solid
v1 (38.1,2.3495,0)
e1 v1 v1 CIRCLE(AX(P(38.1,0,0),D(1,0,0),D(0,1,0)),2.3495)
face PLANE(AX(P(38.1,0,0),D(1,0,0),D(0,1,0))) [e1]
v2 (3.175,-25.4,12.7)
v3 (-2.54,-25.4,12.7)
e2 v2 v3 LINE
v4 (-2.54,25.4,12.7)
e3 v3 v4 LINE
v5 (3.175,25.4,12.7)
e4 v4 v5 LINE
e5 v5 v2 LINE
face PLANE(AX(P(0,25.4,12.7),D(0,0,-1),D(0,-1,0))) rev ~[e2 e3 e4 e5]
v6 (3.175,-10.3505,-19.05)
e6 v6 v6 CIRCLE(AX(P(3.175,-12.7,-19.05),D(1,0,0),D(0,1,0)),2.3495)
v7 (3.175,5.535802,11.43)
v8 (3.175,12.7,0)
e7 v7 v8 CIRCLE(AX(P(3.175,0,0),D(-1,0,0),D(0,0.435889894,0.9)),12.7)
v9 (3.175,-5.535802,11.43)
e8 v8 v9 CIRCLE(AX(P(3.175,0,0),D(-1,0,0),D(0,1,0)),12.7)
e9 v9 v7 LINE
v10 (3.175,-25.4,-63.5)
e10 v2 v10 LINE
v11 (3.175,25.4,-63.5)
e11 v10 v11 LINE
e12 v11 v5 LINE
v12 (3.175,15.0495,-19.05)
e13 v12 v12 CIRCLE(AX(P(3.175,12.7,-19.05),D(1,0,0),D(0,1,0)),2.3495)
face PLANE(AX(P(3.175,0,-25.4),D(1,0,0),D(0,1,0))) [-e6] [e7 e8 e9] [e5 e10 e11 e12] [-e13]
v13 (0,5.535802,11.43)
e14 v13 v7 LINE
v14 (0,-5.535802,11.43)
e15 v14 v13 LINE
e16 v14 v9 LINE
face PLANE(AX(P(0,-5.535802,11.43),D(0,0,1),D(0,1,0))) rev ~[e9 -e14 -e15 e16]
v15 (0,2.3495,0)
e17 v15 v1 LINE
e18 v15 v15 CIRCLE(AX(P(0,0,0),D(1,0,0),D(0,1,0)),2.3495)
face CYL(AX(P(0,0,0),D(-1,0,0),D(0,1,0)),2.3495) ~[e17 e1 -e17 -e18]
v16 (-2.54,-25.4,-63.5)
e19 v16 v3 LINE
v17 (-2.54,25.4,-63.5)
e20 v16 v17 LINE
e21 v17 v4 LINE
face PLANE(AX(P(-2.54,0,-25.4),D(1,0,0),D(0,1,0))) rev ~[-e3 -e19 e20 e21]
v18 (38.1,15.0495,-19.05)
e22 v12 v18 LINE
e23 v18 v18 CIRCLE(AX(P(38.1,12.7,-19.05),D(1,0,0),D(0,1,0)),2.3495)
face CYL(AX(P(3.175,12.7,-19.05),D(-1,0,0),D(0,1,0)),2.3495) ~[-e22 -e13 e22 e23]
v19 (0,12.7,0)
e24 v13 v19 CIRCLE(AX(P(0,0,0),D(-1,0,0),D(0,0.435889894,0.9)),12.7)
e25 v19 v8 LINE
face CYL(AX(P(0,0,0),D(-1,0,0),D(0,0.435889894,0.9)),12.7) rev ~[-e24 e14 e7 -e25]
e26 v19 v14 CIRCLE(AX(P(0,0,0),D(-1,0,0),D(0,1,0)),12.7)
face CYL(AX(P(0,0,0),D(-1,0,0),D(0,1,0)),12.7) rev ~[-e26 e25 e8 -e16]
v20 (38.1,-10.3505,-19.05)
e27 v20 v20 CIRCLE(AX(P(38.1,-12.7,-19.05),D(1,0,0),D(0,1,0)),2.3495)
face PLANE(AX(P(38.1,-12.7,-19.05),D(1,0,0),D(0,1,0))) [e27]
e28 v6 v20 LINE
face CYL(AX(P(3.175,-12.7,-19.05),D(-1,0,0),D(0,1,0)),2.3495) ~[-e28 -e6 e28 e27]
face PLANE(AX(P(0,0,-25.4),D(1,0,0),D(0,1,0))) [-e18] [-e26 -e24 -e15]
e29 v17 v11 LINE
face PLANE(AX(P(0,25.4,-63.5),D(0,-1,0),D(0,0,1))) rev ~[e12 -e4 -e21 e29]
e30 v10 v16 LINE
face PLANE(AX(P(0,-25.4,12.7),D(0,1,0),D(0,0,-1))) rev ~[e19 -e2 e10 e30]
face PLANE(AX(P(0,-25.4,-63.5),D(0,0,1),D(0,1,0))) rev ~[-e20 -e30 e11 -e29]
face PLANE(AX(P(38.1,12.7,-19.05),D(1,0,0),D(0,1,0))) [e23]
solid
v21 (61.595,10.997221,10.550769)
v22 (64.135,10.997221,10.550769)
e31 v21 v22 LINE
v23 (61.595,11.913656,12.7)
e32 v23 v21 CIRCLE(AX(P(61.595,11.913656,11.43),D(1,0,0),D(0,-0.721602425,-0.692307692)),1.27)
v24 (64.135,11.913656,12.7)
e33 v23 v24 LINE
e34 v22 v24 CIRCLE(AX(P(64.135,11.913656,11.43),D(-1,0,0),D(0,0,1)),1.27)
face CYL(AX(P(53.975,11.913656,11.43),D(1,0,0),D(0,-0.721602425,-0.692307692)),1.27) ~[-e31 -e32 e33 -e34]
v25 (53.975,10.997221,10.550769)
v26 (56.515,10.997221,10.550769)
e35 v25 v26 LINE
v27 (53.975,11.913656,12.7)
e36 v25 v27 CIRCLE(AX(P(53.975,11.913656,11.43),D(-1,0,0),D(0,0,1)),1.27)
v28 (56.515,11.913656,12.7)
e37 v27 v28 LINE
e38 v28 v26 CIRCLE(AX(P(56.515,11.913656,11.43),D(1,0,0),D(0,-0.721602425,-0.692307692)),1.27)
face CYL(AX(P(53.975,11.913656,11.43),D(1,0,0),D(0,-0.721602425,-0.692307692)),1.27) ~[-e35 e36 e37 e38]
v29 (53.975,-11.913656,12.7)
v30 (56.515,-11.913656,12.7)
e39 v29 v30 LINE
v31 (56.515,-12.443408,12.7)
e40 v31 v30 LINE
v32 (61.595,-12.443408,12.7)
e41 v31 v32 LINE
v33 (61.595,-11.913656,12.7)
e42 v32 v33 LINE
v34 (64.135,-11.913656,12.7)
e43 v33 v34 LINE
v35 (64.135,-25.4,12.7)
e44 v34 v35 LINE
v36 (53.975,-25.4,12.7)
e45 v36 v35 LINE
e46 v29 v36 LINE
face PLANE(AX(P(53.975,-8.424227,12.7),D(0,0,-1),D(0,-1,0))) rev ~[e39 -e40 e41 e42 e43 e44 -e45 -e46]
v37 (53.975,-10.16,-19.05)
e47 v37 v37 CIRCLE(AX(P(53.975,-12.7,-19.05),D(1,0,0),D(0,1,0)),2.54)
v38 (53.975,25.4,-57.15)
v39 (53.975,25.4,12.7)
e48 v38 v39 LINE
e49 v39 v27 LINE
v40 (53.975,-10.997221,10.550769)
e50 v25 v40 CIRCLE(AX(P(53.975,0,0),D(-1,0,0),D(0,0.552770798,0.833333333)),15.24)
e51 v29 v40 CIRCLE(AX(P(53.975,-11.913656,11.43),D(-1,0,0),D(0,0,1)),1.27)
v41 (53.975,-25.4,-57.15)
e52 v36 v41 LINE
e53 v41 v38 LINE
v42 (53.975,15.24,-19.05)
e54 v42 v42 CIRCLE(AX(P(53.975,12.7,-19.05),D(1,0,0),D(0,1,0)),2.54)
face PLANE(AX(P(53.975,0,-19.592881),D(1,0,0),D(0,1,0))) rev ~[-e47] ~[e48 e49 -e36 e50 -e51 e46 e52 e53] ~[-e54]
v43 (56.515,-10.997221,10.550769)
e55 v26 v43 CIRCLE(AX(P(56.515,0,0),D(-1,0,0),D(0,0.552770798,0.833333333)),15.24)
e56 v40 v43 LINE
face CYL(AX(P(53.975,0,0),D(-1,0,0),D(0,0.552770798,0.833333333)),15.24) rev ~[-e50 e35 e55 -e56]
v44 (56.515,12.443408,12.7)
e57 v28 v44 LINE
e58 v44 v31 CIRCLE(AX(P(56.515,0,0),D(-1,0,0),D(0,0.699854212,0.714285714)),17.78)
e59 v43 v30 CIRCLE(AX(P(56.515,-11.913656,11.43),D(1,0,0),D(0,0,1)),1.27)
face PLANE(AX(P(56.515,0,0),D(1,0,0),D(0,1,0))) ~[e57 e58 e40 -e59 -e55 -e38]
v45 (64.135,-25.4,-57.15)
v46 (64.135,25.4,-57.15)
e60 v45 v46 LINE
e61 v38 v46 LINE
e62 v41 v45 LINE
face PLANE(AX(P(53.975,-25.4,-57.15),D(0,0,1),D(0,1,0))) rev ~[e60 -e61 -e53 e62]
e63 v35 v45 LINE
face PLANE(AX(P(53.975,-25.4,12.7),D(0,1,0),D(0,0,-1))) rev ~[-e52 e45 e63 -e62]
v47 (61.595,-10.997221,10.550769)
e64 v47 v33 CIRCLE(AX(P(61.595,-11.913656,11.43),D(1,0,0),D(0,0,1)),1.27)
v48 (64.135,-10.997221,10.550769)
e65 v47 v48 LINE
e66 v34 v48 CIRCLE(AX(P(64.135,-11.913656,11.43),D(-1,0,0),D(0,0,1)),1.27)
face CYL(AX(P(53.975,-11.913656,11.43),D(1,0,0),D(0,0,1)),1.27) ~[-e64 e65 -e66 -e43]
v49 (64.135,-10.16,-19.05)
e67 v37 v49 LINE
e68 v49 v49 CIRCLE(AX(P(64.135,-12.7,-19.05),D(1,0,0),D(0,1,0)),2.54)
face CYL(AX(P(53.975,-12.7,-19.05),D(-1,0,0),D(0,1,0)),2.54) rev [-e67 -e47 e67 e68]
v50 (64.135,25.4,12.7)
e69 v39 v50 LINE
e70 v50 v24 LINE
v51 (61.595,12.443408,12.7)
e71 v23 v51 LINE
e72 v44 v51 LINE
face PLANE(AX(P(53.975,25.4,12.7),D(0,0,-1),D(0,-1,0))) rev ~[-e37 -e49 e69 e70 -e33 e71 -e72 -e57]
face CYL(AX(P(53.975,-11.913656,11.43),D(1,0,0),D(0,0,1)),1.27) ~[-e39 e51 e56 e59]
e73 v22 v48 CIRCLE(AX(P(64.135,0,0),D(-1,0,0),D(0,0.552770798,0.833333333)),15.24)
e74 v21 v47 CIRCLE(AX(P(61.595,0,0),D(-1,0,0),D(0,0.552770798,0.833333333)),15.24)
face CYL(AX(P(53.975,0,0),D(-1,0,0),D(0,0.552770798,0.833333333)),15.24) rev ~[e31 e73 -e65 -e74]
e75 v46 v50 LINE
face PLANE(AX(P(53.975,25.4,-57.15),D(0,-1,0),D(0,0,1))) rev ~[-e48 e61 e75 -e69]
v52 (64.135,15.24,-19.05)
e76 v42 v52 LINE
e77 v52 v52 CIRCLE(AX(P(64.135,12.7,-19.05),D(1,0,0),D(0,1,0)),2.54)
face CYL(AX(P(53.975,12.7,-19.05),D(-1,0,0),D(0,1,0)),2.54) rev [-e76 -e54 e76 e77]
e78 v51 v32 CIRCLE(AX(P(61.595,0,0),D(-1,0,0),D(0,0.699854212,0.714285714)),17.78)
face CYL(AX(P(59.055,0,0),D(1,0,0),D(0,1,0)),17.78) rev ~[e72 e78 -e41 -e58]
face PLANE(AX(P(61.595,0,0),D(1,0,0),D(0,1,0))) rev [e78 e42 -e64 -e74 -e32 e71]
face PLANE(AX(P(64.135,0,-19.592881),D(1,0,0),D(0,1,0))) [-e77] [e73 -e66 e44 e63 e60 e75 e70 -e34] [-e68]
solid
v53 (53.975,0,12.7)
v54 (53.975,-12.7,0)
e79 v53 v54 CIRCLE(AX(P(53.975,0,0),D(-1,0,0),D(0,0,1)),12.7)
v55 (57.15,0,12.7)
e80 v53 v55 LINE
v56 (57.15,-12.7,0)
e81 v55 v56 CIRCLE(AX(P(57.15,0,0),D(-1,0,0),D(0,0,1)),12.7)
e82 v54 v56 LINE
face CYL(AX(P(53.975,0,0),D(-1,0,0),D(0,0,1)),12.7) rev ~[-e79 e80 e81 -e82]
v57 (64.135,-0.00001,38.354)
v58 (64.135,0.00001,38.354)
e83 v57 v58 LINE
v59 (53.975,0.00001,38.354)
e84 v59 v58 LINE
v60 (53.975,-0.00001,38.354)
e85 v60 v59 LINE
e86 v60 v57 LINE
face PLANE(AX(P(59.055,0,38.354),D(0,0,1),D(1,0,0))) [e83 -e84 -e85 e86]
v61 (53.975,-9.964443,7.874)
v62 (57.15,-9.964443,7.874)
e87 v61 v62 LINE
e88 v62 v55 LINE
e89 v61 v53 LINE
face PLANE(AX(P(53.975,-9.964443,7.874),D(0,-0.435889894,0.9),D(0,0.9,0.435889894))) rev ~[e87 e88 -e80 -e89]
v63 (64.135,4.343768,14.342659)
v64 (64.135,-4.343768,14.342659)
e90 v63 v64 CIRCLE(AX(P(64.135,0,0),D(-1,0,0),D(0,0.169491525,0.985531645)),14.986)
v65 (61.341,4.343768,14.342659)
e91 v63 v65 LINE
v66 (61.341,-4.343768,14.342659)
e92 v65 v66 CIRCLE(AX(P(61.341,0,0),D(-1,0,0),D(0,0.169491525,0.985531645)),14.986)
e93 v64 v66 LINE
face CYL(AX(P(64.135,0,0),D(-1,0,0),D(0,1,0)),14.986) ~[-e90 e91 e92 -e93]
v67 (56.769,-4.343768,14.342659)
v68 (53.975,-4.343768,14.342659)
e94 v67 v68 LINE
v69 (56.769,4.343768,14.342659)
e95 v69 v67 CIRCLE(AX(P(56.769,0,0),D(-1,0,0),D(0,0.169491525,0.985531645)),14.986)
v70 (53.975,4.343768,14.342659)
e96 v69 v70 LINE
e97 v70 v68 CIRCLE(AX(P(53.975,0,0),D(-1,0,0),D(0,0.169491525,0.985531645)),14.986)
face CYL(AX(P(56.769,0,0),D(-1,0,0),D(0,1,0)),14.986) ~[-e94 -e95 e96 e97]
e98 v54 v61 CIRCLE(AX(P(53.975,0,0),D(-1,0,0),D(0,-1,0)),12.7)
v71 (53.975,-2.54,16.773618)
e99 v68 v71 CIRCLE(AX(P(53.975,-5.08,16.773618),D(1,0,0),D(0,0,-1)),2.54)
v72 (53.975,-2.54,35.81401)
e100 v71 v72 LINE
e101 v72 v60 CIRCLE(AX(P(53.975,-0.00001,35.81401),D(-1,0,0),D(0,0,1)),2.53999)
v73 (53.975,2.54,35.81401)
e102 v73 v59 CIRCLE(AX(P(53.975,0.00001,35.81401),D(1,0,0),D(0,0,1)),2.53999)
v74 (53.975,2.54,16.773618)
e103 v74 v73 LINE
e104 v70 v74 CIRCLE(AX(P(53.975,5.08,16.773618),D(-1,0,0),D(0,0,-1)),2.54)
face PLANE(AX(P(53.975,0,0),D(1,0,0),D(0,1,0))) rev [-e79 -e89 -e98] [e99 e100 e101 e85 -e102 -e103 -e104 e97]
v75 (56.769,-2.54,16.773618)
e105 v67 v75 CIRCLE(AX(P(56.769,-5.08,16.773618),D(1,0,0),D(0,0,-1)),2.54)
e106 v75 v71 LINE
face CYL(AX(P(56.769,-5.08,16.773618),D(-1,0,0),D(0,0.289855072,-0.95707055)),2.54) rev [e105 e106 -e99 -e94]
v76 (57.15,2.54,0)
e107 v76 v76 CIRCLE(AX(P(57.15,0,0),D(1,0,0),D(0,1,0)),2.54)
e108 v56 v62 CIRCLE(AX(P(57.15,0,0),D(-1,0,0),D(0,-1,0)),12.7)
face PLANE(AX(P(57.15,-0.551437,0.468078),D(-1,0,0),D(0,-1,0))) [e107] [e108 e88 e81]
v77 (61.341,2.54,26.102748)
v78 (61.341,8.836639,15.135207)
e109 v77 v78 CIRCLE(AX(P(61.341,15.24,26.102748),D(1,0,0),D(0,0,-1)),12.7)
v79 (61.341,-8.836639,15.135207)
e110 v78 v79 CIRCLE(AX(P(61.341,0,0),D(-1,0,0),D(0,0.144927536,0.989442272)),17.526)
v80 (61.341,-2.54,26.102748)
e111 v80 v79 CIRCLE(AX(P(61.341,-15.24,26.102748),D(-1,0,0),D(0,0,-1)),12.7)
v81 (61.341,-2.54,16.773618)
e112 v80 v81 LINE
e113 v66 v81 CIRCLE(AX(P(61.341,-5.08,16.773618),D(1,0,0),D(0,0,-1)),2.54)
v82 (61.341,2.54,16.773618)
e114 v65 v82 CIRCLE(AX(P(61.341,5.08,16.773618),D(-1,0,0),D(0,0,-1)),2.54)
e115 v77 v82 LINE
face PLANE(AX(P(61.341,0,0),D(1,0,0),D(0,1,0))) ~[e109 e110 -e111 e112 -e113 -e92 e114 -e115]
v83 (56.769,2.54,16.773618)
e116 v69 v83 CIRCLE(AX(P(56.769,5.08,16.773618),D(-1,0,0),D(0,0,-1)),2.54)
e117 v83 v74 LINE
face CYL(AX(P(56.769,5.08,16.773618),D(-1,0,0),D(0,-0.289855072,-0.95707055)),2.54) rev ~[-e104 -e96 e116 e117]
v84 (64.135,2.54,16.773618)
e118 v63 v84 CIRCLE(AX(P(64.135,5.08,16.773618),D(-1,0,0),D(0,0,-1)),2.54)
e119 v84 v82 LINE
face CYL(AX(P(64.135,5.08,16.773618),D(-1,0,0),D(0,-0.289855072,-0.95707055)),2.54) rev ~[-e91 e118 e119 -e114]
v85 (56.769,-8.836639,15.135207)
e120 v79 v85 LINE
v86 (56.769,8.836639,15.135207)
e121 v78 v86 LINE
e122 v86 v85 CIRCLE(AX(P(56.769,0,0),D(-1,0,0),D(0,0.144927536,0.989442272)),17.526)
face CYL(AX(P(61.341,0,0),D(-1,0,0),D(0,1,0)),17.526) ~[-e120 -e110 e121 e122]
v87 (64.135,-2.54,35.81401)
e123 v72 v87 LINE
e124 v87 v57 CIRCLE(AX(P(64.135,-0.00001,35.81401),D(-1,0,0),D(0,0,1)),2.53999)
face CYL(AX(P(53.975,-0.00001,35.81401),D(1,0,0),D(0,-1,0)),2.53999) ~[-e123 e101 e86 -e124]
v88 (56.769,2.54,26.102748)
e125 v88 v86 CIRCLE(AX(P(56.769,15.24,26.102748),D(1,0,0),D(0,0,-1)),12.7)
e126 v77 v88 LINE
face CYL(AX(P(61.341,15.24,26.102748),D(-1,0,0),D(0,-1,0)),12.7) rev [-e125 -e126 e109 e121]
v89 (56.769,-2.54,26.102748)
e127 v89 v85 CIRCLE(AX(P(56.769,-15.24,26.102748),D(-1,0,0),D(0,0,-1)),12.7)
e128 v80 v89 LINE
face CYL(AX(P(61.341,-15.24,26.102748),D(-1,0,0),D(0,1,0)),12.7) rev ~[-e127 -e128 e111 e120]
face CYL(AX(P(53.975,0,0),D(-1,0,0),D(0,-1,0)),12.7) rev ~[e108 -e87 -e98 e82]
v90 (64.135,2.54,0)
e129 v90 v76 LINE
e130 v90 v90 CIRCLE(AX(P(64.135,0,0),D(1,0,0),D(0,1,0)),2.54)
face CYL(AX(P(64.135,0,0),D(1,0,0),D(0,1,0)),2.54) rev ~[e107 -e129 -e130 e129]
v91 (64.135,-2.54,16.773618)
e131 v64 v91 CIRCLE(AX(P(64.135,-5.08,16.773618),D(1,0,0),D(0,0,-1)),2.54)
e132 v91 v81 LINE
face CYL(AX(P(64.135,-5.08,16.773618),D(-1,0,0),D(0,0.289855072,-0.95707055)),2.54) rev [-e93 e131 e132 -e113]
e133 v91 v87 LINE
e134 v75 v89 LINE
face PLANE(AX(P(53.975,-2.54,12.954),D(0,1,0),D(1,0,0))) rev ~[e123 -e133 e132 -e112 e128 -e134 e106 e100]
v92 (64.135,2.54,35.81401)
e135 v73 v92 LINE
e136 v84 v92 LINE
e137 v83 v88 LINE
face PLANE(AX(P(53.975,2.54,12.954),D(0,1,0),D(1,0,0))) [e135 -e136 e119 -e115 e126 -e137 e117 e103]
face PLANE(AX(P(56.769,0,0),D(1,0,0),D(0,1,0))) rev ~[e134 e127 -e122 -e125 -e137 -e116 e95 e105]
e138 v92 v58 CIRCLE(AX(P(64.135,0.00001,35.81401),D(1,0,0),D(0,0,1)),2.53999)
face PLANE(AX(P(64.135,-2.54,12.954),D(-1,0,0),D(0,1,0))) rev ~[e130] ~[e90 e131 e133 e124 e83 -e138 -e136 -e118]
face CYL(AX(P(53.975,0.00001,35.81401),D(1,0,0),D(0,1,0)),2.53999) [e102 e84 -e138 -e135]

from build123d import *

# Parameters (mm, degrees)
F0_R      = 2.3495
F1_DEPTH  = 38.1
F2_W      = 50.8
F2_H      = 76.2
F3_DEPTH  = 2.54
F5_DEPTH  = 3.175
F6_R      = 2.3495
F7_DEPTH  = 34.925
F9_R      = 2.54
F10_DEPTH = 10.16
F11_R     = 1.27
F12_W     = 5.08
F12_H     = 9.2631512689
F14_W     = 2.54
F14_H     = 14.986
F16_R     = 2.54
F17_DEPTH = 10.16
F18_R     = 2.54
F19_DEPTH = 3.175
F21_W     = 10.16
F21_H     = 5.08
F22_DEPTH = 25.4
F23_R     = 2.54
F24_R     = 12.7
F25_R     = 2.53999


# Not quite as in the source:
# - a fillet or chamfer is up to 0.001 mm smaller than in the source, because OpenCascade refuses the exact size
# - a feature names something its author has since deleted; it is built from what else it names


with BuildPart() as f1:
    # F0 (on Right) → F1 (new body)
    with BuildSketch(Plane.YZ):
        Circle(F0_R)
    extrude(amount=F1_DEPTH)

    # F2 (on Right) → F3 (join)
    with BuildSketch(Plane.YZ):
        with Locations((0, -25.4)):
            Rectangle(F2_W, F2_H)
    extrude(amount=-F3_DEPTH)

    # F4 (on face) → F5 (join)
    with BuildSketch(Plane.YZ):
        Polygon((25.4, 12.7), (0, 12.7), (-25.4, 12.7), (-25.4, -63.5), (25.4, -63.5), align=None)
        with BuildLine():
            ThreePointArc((5.5358016583, 11.43), (10.7609172718, 6.7448246434), (12.7, 0))
            ThreePointArc((12.7, 0), (-6.7448246434, -10.7609172718), (-5.5358016583, 11.43))
            ThreePointArc((-5.5358016583, 11.43), (-2.8398063314, 12.3784288179), (0, 12.7))
            ThreePointArc((0, 12.7), (2.8398063314, 12.3784288179), (5.5358016583, 11.43))
        make_face(mode=Mode.SUBTRACT)
        with BuildLine():
            Line((-5.5358016583, 11.43), (5.5358016583, 11.43))
            ThreePointArc((5.5358016583, 11.43), (2.8398063314, 12.3784288179), (0, 12.7))
            ThreePointArc((0, 12.7), (-2.8398063314, 12.3784288179), (-5.5358016583, 11.43))
        make_face()
    extrude(amount=F5_DEPTH)

    # F6 (on face) → F7 (join, through all)
    with BuildSketch(Plane.YZ.offset(3.175)):
        with Locations((-12.7, -19.05)):
            Circle(F6_R)
        with Locations((12.7, -19.05)):
            Circle(F6_R)
    extrude(amount=F7_DEPTH)


with BuildPart() as f10:
    # F9 (on offset) → F10 (new body)
    with BuildSketch(Plane.YZ.offset(53.975)):
        with BuildLine():
            Line((-25.4, 12.7), (-25.4, -57.15))
            Line((-25.4, -57.15), (25.4, -57.15))
            Line((25.4, -57.15), (25.4, 12.7))
            Line((25.4, 12.7), (8.4242269675, 12.7))
            ThreePointArc((8.4242269675, 12.7), (13.4283807472, 7.2066768006), (15.24, 0))
            ThreePointArc((15.24, 0), (-7.2066768006, -13.4283807472), (-8.4242269675, 12.7))
            Line((-8.4242269675, 12.7), (-25.4, 12.7))
        make_face()
        with Locations((-12.7, -19.05)):
            Circle(F9_R, mode=Mode.SUBTRACT)
        with Locations((12.7, -19.05)):
            Circle(F9_R, mode=Mode.SUBTRACT)
    extrude(amount=F10_DEPTH)

    # F11
    f11_edges = [f10.edges().sort_by_distance(p)[0] for p in [
        (59.055, 8.424227, 12.7),
        (59.055, -8.424227, 12.7),
    ]]
    fillet(f11_edges, radius=F11_R)

    # F12 (on Top) → F13 (revolve, cut)
    with BuildSketch(Plane.XY):
        with Locations((59.055, 13.1484243655)):
            Rectangle(F12_W, F12_H)
    revolve(axis=Axis((28.3873360604, 0, 0), (1, 0, 0)), mode=Mode.SUBTRACT)


with BuildPart() as f15:
    # F14 (on Top) → F15 (revolve)
    with BuildSketch(Plane.XY):
        with Locations((55.245, 7.493)):
            Rectangle(F14_W, F14_H)
        Polygon((56.769, 14.986), (56.515, 14.986), (56.515, 0), (61.595, 0), (61.595, 14.986), (61.341, 14.986), (61.341, 17.526), (56.769, 17.526), align=None)
        with Locations((62.865, 7.493)):
            Rectangle(F14_W, F14_H)
    revolve(axis=Axis((59.055, 0, 0), (1, 0, 0)))

    # F16 (on face) → F17 (cut, through all)
    with BuildSketch(Plane.YZ.offset(64.135)):
        Circle(F16_R)
    extrude(amount=-F17_DEPTH, mode=Mode.SUBTRACT)

    # F18 (on face) → F19 (cut)
    with BuildSketch(Plane(origin=(53.975, 0, 0), x_dir=(0, -1, 0), z_dir=(-1, 0, 0))):
        with BuildLine():
            ThreePointArc((0, 12.7), (-8.9802561211, -8.9802561211), (12.7, 0))
            ThreePointArc((12.7, 0), (11.9966334008, 4.1678276171), (9.9644429849, 7.874))
            Line((9.9644429849, 7.874), (0, 12.7))
        make_face()
        Circle(F18_R, mode=Mode.SUBTRACT)
    extrude(amount=-F19_DEPTH, mode=Mode.SUBTRACT)

    # F21 (on offset) → F22 (join)
    with BuildSketch(Plane.XY.offset(12.954)):
        with Locations((59.055, 0)):
            Rectangle(F21_W, F21_H)
    extrude(amount=F22_DEPTH)

    # F23
    f23_edges = [f15.edges().sort_by_distance(p)[0] for p in [
        (62.738, -2.54, 14.769177),
        (62.738, 2.54, 14.769177),
        (55.372, -2.54, 14.769177),
        (55.372, 2.54, 14.769177),
    ]]
    fillet(f23_edges, radius=F23_R)

    # F24
    f24_edges = [f15.edges().sort_by_distance(p)[0] for p in [
        (59.055, 2.54, 17.340965),
        (59.055, -2.54, 17.340965),
    ]]
    fillet(f24_edges, radius=F24_R)

    # F25 (radius 2.54 in the source; OpenCascade refuses exactly that, so slightly less here)
    f25_edges = [f15.edges().sort_by_distance(p)[0] for p in [
        (59.055, -2.54, 38.354),
        (59.055, 2.54, 38.354),
    ]]
    fillet(f25_edges, radius=F25_R)


solid = Compound([f1.part, f10.part, f15.part])
